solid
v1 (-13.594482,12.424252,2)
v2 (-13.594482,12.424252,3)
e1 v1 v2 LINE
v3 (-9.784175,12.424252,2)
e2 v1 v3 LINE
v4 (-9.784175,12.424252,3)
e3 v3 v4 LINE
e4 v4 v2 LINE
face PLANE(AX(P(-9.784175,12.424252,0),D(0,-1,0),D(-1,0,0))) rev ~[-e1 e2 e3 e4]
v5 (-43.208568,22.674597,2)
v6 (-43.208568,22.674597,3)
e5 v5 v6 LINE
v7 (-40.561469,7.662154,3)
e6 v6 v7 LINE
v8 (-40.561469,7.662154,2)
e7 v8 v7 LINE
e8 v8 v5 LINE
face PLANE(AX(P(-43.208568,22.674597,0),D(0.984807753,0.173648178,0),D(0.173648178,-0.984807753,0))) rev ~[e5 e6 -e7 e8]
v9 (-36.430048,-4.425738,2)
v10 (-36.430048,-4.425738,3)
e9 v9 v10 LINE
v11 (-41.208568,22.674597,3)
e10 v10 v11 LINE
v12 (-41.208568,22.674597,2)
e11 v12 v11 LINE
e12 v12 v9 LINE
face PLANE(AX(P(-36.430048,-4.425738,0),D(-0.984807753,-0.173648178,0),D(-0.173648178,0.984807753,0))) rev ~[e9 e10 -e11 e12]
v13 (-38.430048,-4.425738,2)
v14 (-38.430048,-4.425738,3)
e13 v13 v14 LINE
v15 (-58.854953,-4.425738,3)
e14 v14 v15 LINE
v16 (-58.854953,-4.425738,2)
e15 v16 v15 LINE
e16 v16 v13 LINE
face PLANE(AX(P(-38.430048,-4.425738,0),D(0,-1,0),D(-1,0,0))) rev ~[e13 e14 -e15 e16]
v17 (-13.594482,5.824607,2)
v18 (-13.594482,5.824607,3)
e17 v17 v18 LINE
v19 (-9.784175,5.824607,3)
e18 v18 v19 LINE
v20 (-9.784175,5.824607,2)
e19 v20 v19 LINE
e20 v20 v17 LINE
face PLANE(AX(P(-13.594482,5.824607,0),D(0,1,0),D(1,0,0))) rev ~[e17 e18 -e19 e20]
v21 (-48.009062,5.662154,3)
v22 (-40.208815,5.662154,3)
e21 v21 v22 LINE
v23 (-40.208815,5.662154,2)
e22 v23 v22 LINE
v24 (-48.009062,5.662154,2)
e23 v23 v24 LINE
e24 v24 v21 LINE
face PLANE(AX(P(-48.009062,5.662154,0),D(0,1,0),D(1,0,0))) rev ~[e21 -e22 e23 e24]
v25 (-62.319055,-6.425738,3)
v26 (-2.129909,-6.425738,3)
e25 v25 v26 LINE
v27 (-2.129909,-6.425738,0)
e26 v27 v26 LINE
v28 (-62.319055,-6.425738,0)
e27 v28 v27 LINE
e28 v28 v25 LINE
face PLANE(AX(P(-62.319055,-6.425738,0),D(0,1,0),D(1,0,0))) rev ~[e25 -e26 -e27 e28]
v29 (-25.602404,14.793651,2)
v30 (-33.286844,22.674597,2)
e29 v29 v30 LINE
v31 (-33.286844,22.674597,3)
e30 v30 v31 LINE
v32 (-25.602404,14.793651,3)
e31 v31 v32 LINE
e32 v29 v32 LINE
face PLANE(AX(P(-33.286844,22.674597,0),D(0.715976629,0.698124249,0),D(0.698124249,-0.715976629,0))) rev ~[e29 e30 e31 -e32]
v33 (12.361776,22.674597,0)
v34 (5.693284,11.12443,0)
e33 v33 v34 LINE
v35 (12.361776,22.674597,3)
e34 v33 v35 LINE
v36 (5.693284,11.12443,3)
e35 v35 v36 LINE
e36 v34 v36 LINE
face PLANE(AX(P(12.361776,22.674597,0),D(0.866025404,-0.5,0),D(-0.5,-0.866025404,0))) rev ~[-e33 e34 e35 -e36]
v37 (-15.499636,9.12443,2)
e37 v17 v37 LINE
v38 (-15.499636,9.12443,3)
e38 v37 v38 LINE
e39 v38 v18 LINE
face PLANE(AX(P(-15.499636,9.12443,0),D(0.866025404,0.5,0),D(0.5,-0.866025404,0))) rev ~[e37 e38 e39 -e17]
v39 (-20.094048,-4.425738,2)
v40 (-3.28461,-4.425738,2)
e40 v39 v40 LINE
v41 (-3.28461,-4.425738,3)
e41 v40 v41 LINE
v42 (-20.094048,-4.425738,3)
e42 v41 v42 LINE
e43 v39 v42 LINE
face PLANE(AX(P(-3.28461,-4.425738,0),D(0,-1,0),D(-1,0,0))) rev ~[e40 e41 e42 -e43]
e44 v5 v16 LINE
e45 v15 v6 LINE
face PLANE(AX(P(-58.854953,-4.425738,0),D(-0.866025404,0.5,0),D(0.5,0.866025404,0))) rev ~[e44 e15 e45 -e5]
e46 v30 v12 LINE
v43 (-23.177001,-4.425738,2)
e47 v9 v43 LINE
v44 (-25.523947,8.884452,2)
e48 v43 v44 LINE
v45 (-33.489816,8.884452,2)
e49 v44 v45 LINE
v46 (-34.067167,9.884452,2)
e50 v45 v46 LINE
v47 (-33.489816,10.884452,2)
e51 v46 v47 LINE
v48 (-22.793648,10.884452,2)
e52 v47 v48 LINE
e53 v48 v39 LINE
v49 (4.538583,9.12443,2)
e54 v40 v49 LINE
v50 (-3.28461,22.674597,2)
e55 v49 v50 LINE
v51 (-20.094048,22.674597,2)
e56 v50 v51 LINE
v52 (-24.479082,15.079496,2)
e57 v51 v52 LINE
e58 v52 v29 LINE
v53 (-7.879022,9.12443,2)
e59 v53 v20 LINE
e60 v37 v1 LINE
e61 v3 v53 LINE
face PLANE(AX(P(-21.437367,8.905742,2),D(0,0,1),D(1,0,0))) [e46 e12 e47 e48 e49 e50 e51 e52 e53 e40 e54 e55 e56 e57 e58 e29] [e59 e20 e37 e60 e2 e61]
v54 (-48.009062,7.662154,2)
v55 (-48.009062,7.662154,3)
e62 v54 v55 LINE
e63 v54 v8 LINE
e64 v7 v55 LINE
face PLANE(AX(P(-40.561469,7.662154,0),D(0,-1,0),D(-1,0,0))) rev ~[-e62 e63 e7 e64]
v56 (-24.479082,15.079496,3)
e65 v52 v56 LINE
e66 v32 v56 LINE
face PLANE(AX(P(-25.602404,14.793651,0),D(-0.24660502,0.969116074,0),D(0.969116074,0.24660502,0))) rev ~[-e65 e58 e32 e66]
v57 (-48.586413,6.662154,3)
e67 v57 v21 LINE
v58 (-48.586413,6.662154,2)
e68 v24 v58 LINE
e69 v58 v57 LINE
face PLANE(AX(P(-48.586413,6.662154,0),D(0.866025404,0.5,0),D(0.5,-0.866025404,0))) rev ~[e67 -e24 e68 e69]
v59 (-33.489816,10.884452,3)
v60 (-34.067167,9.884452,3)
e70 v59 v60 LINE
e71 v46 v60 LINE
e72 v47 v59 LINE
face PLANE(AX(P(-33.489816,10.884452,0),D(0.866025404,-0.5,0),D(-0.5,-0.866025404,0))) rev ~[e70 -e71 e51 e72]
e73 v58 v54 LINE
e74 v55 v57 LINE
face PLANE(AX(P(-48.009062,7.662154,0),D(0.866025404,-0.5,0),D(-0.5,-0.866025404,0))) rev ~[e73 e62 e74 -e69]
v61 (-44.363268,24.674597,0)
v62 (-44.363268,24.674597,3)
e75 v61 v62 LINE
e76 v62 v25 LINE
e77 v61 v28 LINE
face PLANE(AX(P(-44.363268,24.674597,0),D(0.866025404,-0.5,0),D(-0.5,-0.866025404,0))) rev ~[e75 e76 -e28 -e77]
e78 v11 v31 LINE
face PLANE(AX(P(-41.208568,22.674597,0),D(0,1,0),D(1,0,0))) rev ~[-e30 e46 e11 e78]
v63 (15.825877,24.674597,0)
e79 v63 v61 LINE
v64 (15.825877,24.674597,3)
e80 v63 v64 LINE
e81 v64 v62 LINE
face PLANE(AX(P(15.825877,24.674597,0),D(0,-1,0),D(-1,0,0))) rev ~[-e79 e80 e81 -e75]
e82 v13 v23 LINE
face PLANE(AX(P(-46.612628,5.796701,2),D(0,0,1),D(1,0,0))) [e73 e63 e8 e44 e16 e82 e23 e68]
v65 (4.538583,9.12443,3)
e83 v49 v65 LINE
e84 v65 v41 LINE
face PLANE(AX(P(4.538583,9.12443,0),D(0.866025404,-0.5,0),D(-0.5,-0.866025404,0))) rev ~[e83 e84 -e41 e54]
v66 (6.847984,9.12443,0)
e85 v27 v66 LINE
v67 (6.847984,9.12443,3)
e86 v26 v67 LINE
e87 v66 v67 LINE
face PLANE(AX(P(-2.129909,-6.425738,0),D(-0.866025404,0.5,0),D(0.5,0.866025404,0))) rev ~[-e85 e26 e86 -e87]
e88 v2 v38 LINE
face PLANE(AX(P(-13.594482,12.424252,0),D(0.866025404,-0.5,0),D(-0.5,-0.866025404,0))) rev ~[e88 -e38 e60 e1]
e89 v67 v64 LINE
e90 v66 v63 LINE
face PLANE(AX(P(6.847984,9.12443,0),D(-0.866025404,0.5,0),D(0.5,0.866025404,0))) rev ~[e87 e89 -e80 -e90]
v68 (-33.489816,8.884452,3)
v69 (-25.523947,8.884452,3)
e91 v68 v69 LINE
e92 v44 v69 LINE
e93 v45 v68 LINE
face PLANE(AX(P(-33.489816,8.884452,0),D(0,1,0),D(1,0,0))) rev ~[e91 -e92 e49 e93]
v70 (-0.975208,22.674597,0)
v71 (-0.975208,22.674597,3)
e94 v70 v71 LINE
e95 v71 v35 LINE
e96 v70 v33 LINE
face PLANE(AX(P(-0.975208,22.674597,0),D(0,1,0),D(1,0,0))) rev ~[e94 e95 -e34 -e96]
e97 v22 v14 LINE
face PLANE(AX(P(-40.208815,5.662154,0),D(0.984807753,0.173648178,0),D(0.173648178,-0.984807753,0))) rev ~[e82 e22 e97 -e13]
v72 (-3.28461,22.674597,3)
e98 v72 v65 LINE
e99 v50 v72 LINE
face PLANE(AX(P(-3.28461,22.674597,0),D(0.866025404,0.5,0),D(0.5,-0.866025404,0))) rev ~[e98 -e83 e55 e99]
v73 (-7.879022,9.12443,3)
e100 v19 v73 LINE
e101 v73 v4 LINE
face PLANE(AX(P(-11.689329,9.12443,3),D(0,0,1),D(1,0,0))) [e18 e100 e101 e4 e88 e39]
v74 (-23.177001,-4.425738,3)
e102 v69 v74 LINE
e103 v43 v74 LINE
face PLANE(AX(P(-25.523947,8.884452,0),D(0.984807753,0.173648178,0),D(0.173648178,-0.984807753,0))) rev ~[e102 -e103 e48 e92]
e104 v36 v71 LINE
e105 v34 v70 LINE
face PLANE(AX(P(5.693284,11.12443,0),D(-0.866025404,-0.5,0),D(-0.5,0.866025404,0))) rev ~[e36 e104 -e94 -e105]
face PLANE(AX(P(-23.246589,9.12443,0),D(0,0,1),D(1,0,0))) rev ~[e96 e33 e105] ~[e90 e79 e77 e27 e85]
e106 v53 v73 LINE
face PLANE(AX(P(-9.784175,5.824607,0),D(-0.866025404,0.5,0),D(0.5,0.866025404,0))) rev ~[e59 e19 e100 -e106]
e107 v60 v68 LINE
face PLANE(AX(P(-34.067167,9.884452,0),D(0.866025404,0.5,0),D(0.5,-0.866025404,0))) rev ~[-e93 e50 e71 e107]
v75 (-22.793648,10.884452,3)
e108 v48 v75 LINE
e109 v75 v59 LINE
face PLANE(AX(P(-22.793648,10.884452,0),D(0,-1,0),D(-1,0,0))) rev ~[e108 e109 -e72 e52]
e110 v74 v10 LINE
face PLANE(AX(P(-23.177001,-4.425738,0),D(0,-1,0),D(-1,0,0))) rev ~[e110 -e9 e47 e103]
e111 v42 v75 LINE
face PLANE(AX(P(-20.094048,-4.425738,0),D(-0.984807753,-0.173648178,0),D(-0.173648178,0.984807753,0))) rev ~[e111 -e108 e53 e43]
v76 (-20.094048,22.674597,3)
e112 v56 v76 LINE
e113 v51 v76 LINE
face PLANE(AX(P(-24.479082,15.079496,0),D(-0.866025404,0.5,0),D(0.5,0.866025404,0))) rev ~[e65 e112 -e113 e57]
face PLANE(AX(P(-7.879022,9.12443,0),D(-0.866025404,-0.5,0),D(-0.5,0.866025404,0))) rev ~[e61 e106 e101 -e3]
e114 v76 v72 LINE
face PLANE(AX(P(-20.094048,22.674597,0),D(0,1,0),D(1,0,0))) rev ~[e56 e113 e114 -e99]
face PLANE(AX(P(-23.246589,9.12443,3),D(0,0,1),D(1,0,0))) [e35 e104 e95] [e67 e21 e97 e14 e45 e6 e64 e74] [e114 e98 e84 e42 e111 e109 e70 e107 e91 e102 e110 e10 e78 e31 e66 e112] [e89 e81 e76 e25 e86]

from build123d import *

# Parameters (mm, degrees)
F1_DEPTH = 2
F2_DEPTH = 3
F3_DEPTH = 3


# Not quite as in the source:
# - a feature names something its author has since deleted; it is built from what else it names


with BuildPart() as f1:
    # F0 (on Top) → F1 (new body)
    with BuildSketch(Plane.XY):
        Polygon((-43.2085677565, 22.6745967576), (-58.8549531333, -4.4257376699), (-38.4300476107, -4.4257376699), (-40.2088151152, 5.6621541398), (-48.0090622621, 5.6621541398), (-48.5864125313, 6.6621541398), (-48.0090622621, 7.6621541398), (-40.5614690766, 7.6621541398), align=None)
    extrude(amount=F1_DEPTH)



with BuildPart() as f1b:
    # F0 (on Top) → F1, piece 2 (new body)
    with BuildSketch(Plane.XY):
        Polygon((-41.2085677565, 22.6745967576), (-36.4300476107, -4.4257376699), (-25.5239465254, -4.4257376699), (-23.5239465254, -4.4257376699), (-23.1770010553, -4.4257376699), (-25.5239465254, 8.8844515061), (-33.4898163741, 8.8844515061), (-34.0671666433, 9.8844515061), (-33.4898163741, 10.8844515061), (-22.7936475677, 10.8844515061), (-20.0940481363, -4.4257376699), (-3.2846095154, -4.4257376699), (4.538583173, 9.1244295439), (-3.2846095154, 22.6745967576), (-20.0940481363, 22.6745967576), (-24.4790815038, 15.0794961721), (-25.6024042349, 14.7936511306), (-33.2868439501, 22.6745967576), align=None)
        Polygon((-15.4996355878, 9.1244295439), (-13.5944822068, 12.424251996), (-9.7841754448, 12.424251996), (-7.8790220638, 9.1244295439), (-9.7841754448, 5.8246070917), (-13.5944822068, 5.8246070917), align=None, mode=Mode.SUBTRACT)
    extrude(amount=F1_DEPTH)


with BuildPart() as f1_1:
    add(f1.part)

    add(f1b.part)  # F2 merges F1b
    # F0 (on Top) → F2 (join)
    with BuildSketch(Plane.XY):
        Polygon((-2.8602079346, 24.6745967576), (-44.3632682949, 24.6745967576), (-62.3190547484, -6.4257376699), (-38.9180315569, -6.4257376699), (-2.129908977, -6.4257376699), (6.8479842498, 9.1244295439), (15.8258774766, 24.6745967576), align=None)
        Polygon((-38.4300476107, -4.4257376699), (-58.8549531333, -4.4257376699), (-43.2085677565, 22.6745967576), (-41.2085677565, 22.6745967576), (-33.2868439501, 22.6745967576), (-30.5356123181, 22.6745967576), (-20.0940481363, 22.6745967576), (-3.2846095154, 22.6745967576), (4.538583173, 9.1244295439), (-3.2846095154, -4.4257376699), (-20.0940481363, -4.4257376699), (-23.1770010553, -4.4257376699), (-23.5239465254, -4.4257376699), (-25.5239465254, -4.4257376699), (-36.4300476107, -4.4257376699), align=None, mode=Mode.SUBTRACT)
        Polygon((12.3617758614, 22.6745967576), (5.6932837114, 11.1244295439), (-0.9752084386, 22.6745967576), align=None, mode=Mode.SUBTRACT)
        Polygon((-25.5239465254, 8.8844515061), (-23.1770010553, -4.4257376699), (-20.0940481363, -4.4257376699), (-22.7936475677, 10.8844515061), (-33.4898163741, 10.8844515061), (-34.0671666433, 9.8844515061), (-33.4898163741, 8.8844515061), align=None)
        Polygon((-40.2088151152, 5.6621541398), (-38.4300476107, -4.4257376699), (-36.4300476107, -4.4257376699), (-41.2085677565, 22.6745967576), (-43.2085677565, 22.6745967576), (-40.5614690766, 7.6621541398), align=None)
        Polygon((-20.0940481363, 22.6745967576), (-30.5356123181, 22.6745967576), (-24.1704509766, 16.1898996279), (-24.4790815038, 15.0794961721), align=None)
        Polygon((-30.5356123181, 22.6745967576), (-33.2868439501, 22.6745967576), (-25.6024042349, 14.7936511306), (-24.4790815038, 15.0794961721), (-24.1704509766, 16.1898996279), align=None)
        Polygon((-48.0090622621, 5.6621541398), (-40.2088151152, 5.6621541398), (-40.5614690766, 7.6621541398), (-48.0090622621, 7.6621541398), (-48.5864125313, 6.6621541398), align=None)
    extrude(amount=F2_DEPTH)

    # F0 (on Top) → F3 (join)
    with BuildSketch(Plane.XY):
        Polygon((-9.7841754448, 12.424251996), (-13.5944822068, 12.424251996), (-15.4996355878, 9.1244295439), (-13.5944822068, 5.8246070917), (-9.7841754448, 5.8246070917), (-7.8790220638, 9.1244295439), align=None)
    extrude(amount=F3_DEPTH)


solid = f1_1.part
